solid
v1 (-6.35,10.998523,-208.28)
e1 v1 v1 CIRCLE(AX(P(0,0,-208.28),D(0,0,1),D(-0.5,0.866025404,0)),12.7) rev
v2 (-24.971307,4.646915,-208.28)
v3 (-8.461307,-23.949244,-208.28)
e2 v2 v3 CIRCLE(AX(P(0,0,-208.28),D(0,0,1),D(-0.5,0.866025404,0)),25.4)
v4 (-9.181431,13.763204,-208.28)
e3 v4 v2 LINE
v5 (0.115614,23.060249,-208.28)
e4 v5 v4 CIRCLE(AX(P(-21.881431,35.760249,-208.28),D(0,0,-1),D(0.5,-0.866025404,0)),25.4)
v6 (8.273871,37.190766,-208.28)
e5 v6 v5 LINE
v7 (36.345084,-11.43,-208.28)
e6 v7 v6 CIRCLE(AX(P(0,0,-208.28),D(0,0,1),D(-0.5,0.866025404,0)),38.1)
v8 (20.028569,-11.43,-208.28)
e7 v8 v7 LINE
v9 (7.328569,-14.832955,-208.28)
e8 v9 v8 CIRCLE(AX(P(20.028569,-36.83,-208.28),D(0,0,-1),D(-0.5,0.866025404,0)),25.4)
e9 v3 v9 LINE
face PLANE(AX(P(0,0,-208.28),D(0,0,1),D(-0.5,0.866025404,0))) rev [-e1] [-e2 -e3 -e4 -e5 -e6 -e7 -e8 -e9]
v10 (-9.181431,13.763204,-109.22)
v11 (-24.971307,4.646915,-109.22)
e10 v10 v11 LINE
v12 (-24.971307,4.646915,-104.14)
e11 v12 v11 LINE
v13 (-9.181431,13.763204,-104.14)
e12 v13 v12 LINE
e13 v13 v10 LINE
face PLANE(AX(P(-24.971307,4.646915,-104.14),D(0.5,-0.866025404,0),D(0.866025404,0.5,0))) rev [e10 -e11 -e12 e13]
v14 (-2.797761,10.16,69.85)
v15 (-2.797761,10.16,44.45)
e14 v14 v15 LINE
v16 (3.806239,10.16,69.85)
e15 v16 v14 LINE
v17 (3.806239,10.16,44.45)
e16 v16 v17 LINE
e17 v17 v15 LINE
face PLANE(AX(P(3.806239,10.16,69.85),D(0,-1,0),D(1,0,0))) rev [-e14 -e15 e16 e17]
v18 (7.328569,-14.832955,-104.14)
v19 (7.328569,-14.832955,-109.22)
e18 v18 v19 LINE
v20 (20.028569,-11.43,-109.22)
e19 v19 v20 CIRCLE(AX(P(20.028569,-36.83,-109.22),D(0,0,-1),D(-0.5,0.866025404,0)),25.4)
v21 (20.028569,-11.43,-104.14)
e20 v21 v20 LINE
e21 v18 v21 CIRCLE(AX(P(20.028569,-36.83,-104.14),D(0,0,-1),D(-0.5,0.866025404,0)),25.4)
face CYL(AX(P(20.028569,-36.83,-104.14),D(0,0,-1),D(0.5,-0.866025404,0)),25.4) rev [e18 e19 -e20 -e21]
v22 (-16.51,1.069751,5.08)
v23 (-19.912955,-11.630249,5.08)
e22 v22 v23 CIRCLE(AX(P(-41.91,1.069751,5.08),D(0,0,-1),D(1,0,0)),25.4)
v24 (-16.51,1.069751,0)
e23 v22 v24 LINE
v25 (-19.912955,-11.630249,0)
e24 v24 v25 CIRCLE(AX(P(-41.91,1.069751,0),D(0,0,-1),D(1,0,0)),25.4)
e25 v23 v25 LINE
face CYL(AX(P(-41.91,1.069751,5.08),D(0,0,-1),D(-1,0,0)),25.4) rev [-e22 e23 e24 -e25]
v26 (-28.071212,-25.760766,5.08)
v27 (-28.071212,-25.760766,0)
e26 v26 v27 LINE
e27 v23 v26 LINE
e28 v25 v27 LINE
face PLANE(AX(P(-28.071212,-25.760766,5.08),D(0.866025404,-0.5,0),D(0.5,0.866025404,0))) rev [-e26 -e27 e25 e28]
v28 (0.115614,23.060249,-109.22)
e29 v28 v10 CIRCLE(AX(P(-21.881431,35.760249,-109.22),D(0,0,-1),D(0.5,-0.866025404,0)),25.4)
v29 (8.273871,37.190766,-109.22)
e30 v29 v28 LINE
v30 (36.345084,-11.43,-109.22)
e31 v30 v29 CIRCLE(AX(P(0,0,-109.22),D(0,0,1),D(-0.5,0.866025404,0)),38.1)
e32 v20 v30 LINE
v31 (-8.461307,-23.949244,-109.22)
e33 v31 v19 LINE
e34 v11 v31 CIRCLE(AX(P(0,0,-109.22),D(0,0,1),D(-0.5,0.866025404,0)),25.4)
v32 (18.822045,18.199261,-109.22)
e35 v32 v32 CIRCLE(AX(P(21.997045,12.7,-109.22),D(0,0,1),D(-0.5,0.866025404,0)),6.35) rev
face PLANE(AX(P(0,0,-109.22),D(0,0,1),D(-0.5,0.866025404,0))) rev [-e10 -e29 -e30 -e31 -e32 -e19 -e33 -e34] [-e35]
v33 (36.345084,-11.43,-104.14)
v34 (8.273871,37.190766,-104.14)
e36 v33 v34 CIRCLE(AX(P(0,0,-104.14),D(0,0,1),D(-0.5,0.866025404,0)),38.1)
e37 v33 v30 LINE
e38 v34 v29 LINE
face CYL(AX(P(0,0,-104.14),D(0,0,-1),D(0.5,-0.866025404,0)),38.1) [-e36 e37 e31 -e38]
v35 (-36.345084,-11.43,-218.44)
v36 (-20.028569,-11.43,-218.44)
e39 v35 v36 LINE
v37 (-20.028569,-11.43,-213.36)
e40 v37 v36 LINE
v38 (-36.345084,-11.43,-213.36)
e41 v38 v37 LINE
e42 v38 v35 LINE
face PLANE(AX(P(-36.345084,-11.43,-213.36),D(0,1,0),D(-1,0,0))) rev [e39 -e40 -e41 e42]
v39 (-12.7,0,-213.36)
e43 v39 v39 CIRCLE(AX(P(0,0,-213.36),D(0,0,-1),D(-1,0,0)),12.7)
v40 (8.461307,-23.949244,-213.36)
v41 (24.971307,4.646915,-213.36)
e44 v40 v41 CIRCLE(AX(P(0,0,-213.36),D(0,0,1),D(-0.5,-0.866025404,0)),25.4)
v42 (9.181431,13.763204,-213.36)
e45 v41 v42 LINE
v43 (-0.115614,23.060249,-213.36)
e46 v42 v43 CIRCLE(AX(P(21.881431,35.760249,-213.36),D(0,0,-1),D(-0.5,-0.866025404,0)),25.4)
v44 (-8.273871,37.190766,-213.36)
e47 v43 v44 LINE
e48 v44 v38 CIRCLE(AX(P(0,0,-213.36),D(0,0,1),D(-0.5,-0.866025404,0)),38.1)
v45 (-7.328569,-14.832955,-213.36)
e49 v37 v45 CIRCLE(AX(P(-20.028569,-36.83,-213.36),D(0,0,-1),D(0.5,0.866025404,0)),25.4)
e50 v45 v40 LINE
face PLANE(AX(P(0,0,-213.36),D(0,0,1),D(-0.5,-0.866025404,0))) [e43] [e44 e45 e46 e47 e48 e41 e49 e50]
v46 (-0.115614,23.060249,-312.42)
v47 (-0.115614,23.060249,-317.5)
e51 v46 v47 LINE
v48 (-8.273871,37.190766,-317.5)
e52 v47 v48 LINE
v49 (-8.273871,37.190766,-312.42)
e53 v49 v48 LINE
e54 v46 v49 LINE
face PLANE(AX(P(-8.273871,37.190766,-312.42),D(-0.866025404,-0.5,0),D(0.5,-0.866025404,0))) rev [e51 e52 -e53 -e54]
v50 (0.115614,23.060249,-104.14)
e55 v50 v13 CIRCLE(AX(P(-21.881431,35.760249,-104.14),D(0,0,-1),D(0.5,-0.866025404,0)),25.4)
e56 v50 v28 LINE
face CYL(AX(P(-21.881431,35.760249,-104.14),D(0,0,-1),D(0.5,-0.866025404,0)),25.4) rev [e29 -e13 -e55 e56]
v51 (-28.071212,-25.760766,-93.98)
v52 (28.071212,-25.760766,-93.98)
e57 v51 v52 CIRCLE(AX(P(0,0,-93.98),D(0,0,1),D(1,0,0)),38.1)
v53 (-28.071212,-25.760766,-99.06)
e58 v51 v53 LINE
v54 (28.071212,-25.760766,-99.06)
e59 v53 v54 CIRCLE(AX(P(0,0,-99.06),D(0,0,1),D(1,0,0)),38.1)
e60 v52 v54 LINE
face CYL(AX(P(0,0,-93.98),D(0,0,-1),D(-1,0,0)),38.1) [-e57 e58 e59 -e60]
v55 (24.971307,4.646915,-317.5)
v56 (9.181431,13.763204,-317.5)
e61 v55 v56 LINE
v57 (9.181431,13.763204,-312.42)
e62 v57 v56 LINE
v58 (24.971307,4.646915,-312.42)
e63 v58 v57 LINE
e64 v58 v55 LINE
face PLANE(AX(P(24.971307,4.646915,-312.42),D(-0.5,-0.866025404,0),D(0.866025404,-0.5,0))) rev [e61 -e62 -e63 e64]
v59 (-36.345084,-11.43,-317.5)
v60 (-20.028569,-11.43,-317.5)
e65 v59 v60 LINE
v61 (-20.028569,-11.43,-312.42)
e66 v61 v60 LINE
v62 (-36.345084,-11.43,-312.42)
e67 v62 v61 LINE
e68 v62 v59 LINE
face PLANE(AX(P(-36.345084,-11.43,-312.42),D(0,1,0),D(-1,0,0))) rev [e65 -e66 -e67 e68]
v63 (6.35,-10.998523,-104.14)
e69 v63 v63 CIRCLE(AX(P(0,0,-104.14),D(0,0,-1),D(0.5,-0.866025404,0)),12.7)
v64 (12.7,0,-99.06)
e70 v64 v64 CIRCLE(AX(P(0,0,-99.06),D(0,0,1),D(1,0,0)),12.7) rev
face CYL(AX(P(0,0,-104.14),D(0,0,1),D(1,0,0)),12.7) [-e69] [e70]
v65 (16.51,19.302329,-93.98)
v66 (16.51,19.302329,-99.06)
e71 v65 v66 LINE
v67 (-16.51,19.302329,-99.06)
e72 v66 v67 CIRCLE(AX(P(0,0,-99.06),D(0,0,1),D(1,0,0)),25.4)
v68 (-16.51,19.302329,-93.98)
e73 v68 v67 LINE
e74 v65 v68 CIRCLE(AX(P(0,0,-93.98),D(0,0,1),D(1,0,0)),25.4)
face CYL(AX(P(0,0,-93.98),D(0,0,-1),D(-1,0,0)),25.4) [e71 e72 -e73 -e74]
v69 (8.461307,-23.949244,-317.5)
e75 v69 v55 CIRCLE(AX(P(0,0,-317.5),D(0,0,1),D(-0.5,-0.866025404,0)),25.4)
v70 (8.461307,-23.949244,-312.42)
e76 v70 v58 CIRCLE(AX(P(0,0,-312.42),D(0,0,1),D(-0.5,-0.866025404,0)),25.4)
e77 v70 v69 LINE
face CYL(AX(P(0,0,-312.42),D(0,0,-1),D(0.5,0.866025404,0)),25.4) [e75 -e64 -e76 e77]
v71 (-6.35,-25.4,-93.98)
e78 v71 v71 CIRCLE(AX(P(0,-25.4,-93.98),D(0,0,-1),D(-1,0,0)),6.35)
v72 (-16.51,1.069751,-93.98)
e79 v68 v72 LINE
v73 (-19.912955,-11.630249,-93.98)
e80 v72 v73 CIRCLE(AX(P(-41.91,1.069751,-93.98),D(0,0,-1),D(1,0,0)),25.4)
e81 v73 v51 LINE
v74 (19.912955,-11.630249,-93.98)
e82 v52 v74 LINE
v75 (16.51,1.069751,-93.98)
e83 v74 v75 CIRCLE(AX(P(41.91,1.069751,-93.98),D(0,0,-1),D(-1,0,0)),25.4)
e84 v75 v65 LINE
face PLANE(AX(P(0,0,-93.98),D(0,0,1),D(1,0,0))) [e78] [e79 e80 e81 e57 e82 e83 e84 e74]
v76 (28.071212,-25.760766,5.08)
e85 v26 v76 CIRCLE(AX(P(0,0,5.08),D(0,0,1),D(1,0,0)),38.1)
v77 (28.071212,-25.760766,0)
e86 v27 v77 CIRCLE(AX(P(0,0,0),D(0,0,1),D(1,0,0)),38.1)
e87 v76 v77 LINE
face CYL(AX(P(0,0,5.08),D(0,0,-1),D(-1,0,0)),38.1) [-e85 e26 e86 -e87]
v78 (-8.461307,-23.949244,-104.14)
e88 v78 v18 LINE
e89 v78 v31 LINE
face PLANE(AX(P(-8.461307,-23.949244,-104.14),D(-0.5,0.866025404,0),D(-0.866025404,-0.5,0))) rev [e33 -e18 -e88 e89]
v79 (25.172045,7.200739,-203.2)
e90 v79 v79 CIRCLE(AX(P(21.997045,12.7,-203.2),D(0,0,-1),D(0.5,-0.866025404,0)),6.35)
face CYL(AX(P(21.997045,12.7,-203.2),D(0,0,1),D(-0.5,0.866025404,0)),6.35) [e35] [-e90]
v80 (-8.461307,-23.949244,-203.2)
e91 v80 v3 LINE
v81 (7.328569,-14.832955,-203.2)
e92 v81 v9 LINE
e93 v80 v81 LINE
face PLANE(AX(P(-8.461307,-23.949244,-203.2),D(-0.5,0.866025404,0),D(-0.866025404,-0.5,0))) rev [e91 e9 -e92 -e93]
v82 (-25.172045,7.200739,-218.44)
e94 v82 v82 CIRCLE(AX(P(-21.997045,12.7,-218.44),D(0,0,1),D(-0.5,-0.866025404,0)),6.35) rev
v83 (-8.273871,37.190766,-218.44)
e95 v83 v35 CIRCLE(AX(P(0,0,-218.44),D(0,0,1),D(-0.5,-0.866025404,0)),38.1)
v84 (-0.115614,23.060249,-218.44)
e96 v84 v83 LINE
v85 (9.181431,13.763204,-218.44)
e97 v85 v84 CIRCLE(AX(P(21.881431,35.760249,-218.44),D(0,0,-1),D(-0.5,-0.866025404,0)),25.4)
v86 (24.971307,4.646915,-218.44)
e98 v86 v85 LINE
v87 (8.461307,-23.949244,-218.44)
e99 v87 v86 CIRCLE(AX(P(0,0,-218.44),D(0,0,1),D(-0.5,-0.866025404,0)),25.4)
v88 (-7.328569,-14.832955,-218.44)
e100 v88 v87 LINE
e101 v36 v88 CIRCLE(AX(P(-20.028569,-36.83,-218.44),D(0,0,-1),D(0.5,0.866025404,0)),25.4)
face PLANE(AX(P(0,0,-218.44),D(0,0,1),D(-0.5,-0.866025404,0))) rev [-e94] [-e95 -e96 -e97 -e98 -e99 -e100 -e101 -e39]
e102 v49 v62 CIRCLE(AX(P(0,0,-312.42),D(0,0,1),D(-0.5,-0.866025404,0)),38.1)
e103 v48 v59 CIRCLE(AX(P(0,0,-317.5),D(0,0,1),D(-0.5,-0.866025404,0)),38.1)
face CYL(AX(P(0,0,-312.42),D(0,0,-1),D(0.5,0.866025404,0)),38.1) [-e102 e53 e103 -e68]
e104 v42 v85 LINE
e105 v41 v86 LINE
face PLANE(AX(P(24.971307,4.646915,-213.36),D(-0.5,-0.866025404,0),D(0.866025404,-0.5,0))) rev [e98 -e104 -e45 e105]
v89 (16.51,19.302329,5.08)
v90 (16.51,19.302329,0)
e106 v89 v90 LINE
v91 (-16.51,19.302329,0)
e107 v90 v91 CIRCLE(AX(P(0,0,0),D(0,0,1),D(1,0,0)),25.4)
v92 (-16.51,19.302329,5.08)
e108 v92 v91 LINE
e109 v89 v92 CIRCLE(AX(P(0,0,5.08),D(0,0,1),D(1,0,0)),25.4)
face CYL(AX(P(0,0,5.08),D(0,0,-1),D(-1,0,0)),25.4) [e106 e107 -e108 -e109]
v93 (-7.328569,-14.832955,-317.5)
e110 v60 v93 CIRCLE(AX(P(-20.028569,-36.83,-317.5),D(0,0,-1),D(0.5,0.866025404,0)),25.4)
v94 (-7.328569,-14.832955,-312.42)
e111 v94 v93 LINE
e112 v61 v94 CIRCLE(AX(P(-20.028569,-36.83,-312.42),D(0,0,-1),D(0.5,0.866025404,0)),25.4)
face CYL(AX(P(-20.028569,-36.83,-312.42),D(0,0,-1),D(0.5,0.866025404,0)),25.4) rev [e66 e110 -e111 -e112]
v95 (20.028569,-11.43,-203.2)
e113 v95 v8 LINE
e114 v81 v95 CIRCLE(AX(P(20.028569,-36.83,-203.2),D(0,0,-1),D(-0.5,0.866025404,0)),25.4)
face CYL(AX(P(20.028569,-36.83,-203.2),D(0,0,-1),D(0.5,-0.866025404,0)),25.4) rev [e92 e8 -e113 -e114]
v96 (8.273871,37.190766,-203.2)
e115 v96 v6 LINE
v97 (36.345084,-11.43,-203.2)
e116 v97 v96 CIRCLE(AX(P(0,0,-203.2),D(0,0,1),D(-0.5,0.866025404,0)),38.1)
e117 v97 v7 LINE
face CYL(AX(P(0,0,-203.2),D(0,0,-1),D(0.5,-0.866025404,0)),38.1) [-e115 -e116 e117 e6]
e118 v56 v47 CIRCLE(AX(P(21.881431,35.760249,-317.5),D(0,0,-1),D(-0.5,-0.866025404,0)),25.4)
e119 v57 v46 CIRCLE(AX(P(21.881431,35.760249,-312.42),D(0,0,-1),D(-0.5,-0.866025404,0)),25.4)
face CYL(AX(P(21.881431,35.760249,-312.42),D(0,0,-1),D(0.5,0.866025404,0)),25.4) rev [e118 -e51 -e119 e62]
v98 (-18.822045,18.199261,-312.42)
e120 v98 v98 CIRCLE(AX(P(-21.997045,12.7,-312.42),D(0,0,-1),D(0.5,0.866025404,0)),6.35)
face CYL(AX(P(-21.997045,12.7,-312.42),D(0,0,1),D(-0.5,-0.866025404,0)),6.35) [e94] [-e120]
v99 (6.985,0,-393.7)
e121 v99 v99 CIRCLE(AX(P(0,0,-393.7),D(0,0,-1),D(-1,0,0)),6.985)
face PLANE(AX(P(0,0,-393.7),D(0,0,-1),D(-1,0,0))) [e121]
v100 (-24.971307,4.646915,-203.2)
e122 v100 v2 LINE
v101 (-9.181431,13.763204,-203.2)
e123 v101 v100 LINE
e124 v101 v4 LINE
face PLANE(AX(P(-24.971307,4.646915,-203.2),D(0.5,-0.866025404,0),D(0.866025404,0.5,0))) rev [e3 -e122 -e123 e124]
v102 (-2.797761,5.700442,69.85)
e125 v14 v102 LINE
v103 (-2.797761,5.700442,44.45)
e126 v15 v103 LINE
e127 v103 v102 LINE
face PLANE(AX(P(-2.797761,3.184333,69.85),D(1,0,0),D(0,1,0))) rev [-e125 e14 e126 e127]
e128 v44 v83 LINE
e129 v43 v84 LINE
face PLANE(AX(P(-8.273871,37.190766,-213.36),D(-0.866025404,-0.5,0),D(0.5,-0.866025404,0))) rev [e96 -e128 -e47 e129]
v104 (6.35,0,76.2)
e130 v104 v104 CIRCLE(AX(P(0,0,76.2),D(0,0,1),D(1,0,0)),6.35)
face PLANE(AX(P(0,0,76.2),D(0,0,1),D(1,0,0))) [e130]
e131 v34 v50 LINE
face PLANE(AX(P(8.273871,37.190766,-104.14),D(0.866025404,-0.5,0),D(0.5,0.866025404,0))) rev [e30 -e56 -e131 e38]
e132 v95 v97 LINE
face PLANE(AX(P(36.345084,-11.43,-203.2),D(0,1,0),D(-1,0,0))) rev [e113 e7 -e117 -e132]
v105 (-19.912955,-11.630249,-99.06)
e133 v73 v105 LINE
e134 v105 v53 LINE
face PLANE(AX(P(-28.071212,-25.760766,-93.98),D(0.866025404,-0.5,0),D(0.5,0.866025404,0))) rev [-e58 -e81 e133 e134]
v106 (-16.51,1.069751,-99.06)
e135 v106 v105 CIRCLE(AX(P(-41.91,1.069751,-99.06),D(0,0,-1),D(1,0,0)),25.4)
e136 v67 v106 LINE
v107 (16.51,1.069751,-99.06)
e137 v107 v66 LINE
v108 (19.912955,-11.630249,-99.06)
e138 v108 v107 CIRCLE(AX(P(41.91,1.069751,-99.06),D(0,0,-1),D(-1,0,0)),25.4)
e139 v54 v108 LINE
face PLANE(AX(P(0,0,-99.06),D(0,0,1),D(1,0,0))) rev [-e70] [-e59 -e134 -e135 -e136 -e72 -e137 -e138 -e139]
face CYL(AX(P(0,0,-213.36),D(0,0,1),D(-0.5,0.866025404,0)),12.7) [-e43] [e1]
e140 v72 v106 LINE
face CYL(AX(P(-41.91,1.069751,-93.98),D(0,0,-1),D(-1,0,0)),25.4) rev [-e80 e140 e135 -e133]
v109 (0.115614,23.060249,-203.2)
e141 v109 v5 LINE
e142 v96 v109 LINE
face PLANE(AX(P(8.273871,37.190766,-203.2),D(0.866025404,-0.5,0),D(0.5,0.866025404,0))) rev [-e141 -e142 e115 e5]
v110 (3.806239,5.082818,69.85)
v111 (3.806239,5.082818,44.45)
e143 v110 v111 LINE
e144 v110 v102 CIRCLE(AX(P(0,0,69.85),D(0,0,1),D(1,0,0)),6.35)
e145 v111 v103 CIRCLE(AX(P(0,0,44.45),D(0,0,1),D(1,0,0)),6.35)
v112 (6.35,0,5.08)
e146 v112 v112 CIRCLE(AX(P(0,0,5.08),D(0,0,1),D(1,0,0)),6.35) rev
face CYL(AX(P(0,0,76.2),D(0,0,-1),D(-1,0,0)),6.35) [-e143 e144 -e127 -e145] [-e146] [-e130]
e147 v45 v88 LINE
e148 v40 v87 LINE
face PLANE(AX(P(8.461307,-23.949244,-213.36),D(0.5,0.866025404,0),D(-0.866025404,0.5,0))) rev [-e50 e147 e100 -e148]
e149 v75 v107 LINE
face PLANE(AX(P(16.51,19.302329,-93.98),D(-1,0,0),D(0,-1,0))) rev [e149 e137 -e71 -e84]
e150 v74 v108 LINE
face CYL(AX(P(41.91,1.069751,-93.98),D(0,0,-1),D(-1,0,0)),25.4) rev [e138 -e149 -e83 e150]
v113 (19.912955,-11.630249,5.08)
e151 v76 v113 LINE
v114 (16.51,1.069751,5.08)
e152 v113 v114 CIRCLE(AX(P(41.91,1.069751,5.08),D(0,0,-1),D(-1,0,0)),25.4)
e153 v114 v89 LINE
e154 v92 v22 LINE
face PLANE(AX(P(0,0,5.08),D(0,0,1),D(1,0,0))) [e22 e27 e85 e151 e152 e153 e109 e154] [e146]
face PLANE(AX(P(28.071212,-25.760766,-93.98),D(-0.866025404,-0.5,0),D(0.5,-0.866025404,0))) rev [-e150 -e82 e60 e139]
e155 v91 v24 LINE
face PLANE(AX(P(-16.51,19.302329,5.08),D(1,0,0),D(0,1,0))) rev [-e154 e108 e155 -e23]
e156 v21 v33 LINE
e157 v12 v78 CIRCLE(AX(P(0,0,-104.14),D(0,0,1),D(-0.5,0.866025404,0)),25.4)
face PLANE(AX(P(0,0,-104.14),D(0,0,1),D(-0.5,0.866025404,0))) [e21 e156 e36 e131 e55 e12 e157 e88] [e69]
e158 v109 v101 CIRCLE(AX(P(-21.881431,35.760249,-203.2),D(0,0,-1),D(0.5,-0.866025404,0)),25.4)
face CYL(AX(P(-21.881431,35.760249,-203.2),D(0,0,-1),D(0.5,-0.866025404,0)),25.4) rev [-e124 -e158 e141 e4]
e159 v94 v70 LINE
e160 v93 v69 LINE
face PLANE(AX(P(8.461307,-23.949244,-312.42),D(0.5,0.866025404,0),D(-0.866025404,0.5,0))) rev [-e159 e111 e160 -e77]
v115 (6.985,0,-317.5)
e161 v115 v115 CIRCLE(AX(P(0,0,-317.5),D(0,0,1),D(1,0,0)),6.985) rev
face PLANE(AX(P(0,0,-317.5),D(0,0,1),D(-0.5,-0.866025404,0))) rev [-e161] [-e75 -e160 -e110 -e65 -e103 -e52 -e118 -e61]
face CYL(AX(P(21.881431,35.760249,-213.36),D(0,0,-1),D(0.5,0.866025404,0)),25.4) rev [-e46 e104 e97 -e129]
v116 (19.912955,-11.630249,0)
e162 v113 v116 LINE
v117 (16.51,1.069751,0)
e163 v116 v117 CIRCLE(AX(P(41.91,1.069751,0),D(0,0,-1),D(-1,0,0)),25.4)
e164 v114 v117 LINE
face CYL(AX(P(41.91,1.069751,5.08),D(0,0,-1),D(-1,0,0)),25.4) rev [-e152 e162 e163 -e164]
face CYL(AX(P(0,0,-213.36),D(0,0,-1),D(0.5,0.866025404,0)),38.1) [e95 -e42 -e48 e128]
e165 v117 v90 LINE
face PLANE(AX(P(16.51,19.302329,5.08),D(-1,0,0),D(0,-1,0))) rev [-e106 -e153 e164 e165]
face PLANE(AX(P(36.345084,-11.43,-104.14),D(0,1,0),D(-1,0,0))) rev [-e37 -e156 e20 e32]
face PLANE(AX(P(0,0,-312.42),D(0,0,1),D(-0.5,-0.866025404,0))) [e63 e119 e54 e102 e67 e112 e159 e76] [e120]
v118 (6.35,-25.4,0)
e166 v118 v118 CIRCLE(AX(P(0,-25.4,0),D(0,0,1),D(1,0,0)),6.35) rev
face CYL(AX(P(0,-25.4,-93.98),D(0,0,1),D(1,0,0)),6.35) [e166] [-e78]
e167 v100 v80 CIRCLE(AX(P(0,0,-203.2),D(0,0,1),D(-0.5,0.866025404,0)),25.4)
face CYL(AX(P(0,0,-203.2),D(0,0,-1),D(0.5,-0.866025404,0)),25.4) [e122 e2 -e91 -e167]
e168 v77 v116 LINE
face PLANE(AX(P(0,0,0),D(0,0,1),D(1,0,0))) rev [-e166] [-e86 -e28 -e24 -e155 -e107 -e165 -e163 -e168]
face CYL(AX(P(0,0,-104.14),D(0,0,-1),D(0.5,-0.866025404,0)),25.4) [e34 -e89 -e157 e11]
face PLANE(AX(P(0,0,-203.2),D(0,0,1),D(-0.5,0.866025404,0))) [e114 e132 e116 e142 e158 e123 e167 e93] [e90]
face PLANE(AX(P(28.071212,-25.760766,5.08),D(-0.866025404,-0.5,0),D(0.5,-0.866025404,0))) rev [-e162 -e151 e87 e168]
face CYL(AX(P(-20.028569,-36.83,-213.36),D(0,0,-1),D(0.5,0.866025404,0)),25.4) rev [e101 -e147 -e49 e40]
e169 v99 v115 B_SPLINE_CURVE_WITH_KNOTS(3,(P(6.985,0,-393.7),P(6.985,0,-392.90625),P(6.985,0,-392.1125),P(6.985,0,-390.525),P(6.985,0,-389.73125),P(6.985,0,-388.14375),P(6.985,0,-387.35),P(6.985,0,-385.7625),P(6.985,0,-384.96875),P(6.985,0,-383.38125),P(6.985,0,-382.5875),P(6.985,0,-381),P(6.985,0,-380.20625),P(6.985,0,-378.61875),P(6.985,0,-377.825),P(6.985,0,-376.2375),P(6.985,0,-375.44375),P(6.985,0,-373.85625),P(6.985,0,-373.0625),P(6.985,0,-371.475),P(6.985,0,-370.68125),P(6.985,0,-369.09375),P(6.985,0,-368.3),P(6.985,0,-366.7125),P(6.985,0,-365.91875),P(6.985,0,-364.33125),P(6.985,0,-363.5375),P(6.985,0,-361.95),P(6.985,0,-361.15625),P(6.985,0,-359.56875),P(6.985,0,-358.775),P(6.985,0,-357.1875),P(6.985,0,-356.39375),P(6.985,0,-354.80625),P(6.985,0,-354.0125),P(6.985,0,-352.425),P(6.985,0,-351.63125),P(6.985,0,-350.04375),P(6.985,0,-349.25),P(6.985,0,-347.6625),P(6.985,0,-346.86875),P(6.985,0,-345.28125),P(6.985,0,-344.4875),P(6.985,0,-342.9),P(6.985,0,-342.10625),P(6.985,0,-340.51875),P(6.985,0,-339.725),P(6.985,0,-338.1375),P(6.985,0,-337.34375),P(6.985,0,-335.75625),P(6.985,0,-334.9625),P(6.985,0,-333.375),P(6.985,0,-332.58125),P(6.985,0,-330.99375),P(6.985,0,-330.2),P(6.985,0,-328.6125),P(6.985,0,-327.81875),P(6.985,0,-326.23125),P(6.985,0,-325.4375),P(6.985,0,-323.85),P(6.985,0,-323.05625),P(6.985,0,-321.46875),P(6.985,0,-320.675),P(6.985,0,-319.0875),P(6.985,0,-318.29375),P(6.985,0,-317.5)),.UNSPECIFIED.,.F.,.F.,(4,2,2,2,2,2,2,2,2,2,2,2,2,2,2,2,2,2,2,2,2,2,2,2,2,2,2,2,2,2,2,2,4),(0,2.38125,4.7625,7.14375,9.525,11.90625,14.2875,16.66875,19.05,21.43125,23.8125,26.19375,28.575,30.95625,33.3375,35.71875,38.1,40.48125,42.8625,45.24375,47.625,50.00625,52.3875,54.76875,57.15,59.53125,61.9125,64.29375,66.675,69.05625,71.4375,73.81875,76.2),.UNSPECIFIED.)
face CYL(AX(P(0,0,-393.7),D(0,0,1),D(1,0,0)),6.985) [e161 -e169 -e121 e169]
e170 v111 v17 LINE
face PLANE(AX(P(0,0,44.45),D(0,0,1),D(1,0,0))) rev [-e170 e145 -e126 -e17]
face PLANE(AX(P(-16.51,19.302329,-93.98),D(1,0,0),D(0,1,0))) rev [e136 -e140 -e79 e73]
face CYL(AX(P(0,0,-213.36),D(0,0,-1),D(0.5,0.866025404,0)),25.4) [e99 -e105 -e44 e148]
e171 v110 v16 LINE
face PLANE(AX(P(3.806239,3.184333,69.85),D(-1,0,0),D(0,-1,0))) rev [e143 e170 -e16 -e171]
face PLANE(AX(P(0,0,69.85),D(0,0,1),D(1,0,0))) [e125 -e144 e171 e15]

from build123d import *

# Parameters (mm, degrees)
BOSS_EXTRUDE1_DEPTH    = 5.08
SKETCH2_R              = 6.35
BOSS_EXTRUDE2_DEPTH    = 76.2
BOSS_EXTRUDE3_START    = 44.45
SKETCH3_W              = 6.604
SKETCH3_H              = 6.975666606
BOSS_EXTRUDE3_DEPTH    = 25.4
SKETCH4_R              = 6.35
BOSS_EXTRUDE4_DEPTH    = 93.98
LPATTERN1_COUNT        = 2
LPATTERN1_PITCH        = 99.06
SKETCH5_R              = 12.7
BOSS_EXTRUDE5_DEPTH    = 5.08
LPATTERN2_COUNT        = 2
LPATTERN2_PITCH        = 109.22
LPATTERN2_COPY_1_DEPTH = 5.08
MOVE_START             = -208.28
MOVE_FACE1_DEPTH       = 104.14
MOVE_START_2           = -203.2
MOVE_FACE1_2_DEPTH     = 93.98
MOVE_FACE1_3_OUTLINE_R = 6.35
MOVE_FACE1_3_DEPTH     = 104.14
MOVE_FACE1_4_DEPTH     = 5.08
MOVE_START_3           = -109.22
MOVE_FACE1_5_DEPTH     = 5.08
LPATTERN3_COUNT        = 2
LPATTERN3_PITCH        = 218.44
LPATTERN3_COPY_1_DEPTH = 5.08
MOVE_START_4           = -317.5
MOVE_FACE2_DEPTH       = 104.14
MOVE_START_5           = -312.42
MOVE_FACE2_2_DEPTH     = 93.98
MOVE_FACE2_3_OUTLINE_R = 6.35
MOVE_FACE2_3_DEPTH     = 104.14
MOVE_FACE2_4_DEPTH     = 5.08
MOVE_START_6           = -218.44
MOVE_FACE2_5_DEPTH     = 5.08
SKETCH6_R              = 6.985
BOSS_EXTRUDE6_DEPTH    = 76.2


# Read off the part's stored shape, not the designer's step: Move Face1, Move Face2
with BuildPart() as part:
    # Sketch1 → Boss-Extrude1 (new body)
    with BuildSketch(Plane.XY):
        with BuildLine():
            Line((28.071212152, -25.760765678), (19.912954744, -11.630249345))
            ThreePointArc((19.912954744, -11.630249345), (17.375484012, -5.504253091), (16.51, 1.069750655))
            Line((16.51, 1.069750655), (16.51, 19.302328875))
            ThreePointArc((16.51, 19.302328875), (0, 25.4), (-16.51, 19.302328875))
            Line((-16.51, 19.302328875), (-16.51, 1.069750655))
            ThreePointArc((-16.51, 1.069750655), (-17.375484012, -5.504253091), (-19.912954744, -11.630249345))
            Line((-19.912954744, -11.630249345), (-28.071212152, -25.760765678))
            ThreePointArc((-28.071212152, -25.760765678), (0, -38.1), (28.071212152, -25.760765678))
        make_face()
    boss_extrude1 = extrude(amount=BOSS_EXTRUDE1_DEPTH)

    # Sketch2 → Boss-Extrude2 (add)
    with BuildSketch(Plane.XY):
        with Locations(Location((0, 0, 0), (0, 0, 180))):
            Circle(SKETCH2_R)
    extrude(amount=BOSS_EXTRUDE2_DEPTH)

    # Sketch3 → Boss-Extrude3 (add)
    with BuildSketch(Plane.XY.offset(BOSS_EXTRUDE3_START)):
        with Locations((0.504239379, 6.672166697)):
            Rectangle(SKETCH3_W, SKETCH3_H)
    extrude(amount=BOSS_EXTRUDE3_DEPTH)

    # Sketch4 → Boss-Extrude4 (add)
    with BuildSketch(Plane(origin=(0, 0, 0), x_dir=(-1, 0, 0), z_dir=(0, 0, -1))):
        with Locations(Location((0, -25.4, 0), (0, 0, 180))):
            Circle(SKETCH4_R)
    boss_extrude4 = extrude(amount=BOSS_EXTRUDE4_DEPTH)

    # LPattern1: Boss-Extrude1 ×2
    with Locations(*[(0, 0, -i * LPATTERN1_PITCH) for i in range(1, LPATTERN1_COUNT)]):
        add(boss_extrude1)

    # Sketch5 → Boss-Extrude5 (add)
    with BuildSketch(Plane(origin=(0, 0, -99.06), x_dir=(-1, 0, 0), z_dir=(0, 0, -1))):
        with Locations(Location((0, 0, 0), (0, 0, 180))):
            Circle(SKETCH5_R)
    boss_extrude5 = extrude(amount=BOSS_EXTRUDE5_DEPTH)

    # LPattern2: Boss-Extrude1, Boss-Extrude4, Boss-Extrude5 ×2
    with Locations(*[(0, 0, -i * LPATTERN2_PITCH) for i in range(1, LPATTERN2_COUNT)]):
        add(boss_extrude1)
        add(boss_extrude4)
        add(boss_extrude5)

    # LPattern2 copy 1 sketch → LPattern2 copy 1 (add)
    with BuildSketch(Plane.XY.offset(-208.28)):
        with BuildLine():
            Line((28.071212152, -25.760765678), (19.912954744, -11.630249345))
            ThreePointArc((19.912954744, -11.630249345), (17.375484012, -5.504253091), (16.51, 1.069750655))
            Line((16.51, 1.069750655), (16.51, 19.302328875))
            ThreePointArc((16.51, 19.302328875), (0, 25.4), (-16.51, 19.302328875))
            Line((-16.51, 19.302328875), (-16.51, 1.069750655))
            ThreePointArc((-16.51, 1.069750655), (-17.375484012, -5.504253091), (-19.912954744, -11.630249345))
            Line((-19.912954744, -11.630249345), (-28.071212152, -25.760765678))
            ThreePointArc((-28.071212152, -25.760765678), (0, -38.1), (28.071212152, -25.760765678))
        make_face()
    extrude(amount=LPATTERN2_COPY_1_DEPTH)

    # Move Face1 outline → Move Face1 (cut)
    with BuildSketch(Plane.XY.offset(MOVE_START)):
        with BuildLine():
            Line((0.115614013, 23.060249345), (1.442792283, 25.358989539))
            ThreePointArc((1.442792283, 25.358989539), (-8.119480999, 24.067281282), (-16.51, 19.302328875))
            Line((-16.51, 19.302328875), (-16.51, 9.532052944))
            Line((-16.51, 9.532052944), (-9.181431243, 13.763204089))
            ThreePointArc((-9.181431243, 13.763204089), (-3.920919001, 17.799737103), (0.115614013, 23.060249345))
        make_face()
        with BuildLine():
            ThreePointArc((19.912954744, -11.630249345), (19.855820207, -11.530771305), (19.79913554, -11.431036234))
            ThreePointArc((19.79913554, -11.431036234), (13.343823196, -12.325425391), (7.328568757, -14.832954744))
            Line((7.328568757, -14.832954744), (-8.461307158, -23.949243854))
            ThreePointArc((-8.461307158, -23.949243854), (-15.673074402, -19.987864788), (-21.240133013, -13.928989539))
            Line((-21.240133013, -13.928989539), (-28.071212152, -25.760765678))
            ThreePointArc((-28.071212152, -25.760765678), (0, -38.1), (28.071212152, -25.760765678))
            Line((28.071212152, -25.760765678), (19.912954744, -11.630249345))
        make_face()
    extrude(amount=MOVE_FACE1_DEPTH, mode=Mode.SUBTRACT)

    # Move Face1 2 outline → Move Face1 2 (cut)
    with BuildSketch(Plane.XY.offset(MOVE_START_2)):
        with BuildLine():
            Line((-5.511396499, -22.246112141), (0.024351243, -19.050046692))
            ThreePointArc((0.024351243, -19.050046692), (-3.175, -19.900738686), (-5.511396499, -22.246112141))
        make_face()
    extrude(amount=MOVE_FACE1_2_DEPTH, mode=Mode.SUBTRACT)

    # Move Face1 3 outline → Move Face1 3 (add)
    with BuildSketch(Plane.XY.offset(MOVE_START)):
        with Locations((21.997045256, 12.7)):
            Circle(MOVE_FACE1_3_OUTLINE_R)
    extrude(amount=MOVE_FACE1_3_DEPTH)

    # Move Face1 4 outline → Move Face1 4 (add)
    with BuildSketch(Plane.XY.offset(MOVE_START)):
        with BuildLine():
            ThreePointArc((36.345083574, -11.43), (32.995567884, 19.05), (8.273871422, 37.190765678))
            Line((8.273871422, 37.190765678), (1.442792283, 25.358989539))
            ThreePointArc((1.442792283, 25.358989539), (9.473461473, 23.567212981), (16.51, 19.302328875))
            Line((16.51, 19.302328875), (16.51, 15.89606545))
            ThreePointArc((16.51, 15.89606545), (28.347045256, 12.7), (16.51, 9.50393455))
            Line((16.51, 9.50393455), (16.51, 1.069750655))
            ThreePointArc((16.51, 1.069750655), (17.346043099, -5.393377176), (19.79913554, -11.431036234))
            ThreePointArc((19.79913554, -11.431036234), (19.913850979, -11.43025906), (20.028568757, -11.43))
            Line((20.028568757, -11.43), (36.345083574, -11.43))
        make_face()
        with BuildLine():
            Line((-16.51, 1.069750655), (-16.51, 9.532052944))
            Line((-16.51, 9.532052944), (-24.971307158, 4.646914979))
            ThreePointArc((-24.971307158, 4.646914979), (-24.90261749, -5.00196383), (-21.240133013, -13.928989539))
            Line((-21.240133013, -13.928989539), (-19.912954744, -11.630249345))
            ThreePointArc((-19.912954744, -11.630249345), (-17.375484012, -5.504253091), (-16.51, 1.069750655))
        make_face()
    extrude(amount=MOVE_FACE1_4_DEPTH)

    # Move Face1 5 outline → Move Face1 5 (add)
    with BuildSketch(Plane.XY.offset(MOVE_START_3)):
        with BuildLine():
            ThreePointArc((36.345083574, -11.43), (32.995567884, 19.05), (8.273871422, 37.190765678))
            Line((8.273871422, 37.190765678), (1.442792283, 25.358989539))
            ThreePointArc((1.442792283, 25.358989539), (9.473461473, 23.567212981), (16.51, 19.302328875))
            Line((16.51, 19.302328875), (16.51, 15.89606545))
            ThreePointArc((16.51, 15.89606545), (28.347045256, 12.7), (16.51, 9.50393455))
            Line((16.51, 9.50393455), (16.51, 1.069750655))
            ThreePointArc((16.51, 1.069750655), (17.346043099, -5.393377176), (19.79913554, -11.431036234))
            ThreePointArc((19.79913554, -11.431036234), (19.913850979, -11.43025906), (20.028568757, -11.43))
            Line((20.028568757, -11.43), (36.345083574, -11.43))
        make_face()
        with BuildLine():
            Line((-16.51, 1.069750655), (-16.51, 9.532052944))
            Line((-16.51, 9.532052944), (-24.971307158, 4.646914979))
            ThreePointArc((-24.971307158, 4.646914979), (-24.90261749, -5.00196383), (-21.240133013, -13.928989539))
            Line((-21.240133013, -13.928989539), (-19.912954744, -11.630249345))
            ThreePointArc((-19.912954744, -11.630249345), (-17.375484012, -5.504253091), (-16.51, 1.069750655))
        make_face()
    extrude(amount=MOVE_FACE1_5_DEPTH)

    # LPattern3: Boss-Extrude1, Boss-Extrude4 ×2
    with Locations(*[(0, 0, -i * LPATTERN3_PITCH) for i in range(1, LPATTERN3_COUNT)]):
        add(boss_extrude1)
        add(boss_extrude4)

    # LPattern3 copy 1 sketch → LPattern3 copy 1 (add)
    with BuildSketch(Plane.XY.offset(-317.5)):
        with BuildLine():
            Line((28.071212152, -25.760765678), (19.912954744, -11.630249345))
            ThreePointArc((19.912954744, -11.630249345), (17.375484012, -5.504253091), (16.51, 1.069750655))
            Line((16.51, 1.069750655), (16.51, 19.302328875))
            ThreePointArc((16.51, 19.302328875), (0, 25.4), (-16.51, 19.302328875))
            Line((-16.51, 19.302328875), (-16.51, 1.069750655))
            ThreePointArc((-16.51, 1.069750655), (-17.375484012, -5.504253091), (-19.912954744, -11.630249345))
            Line((-19.912954744, -11.630249345), (-28.071212152, -25.760765678))
            ThreePointArc((-28.071212152, -25.760765678), (0, -38.1), (28.071212152, -25.760765678))
        make_face()
    extrude(amount=LPATTERN3_COPY_1_DEPTH)

    # Move Face2 outline → Move Face2 (cut)
    with BuildSketch(Plane.XY.offset(MOVE_START_4)):
        with BuildLine():
            ThreePointArc((16.51, 19.302328875), (8.119480999, 24.067281282), (-1.442792283, 25.358989539))
            Line((-1.442792283, 25.358989539), (-0.115614013, 23.060249345))
            ThreePointArc((-0.115614013, 23.060249345), (3.920919001, 17.799737103), (9.181431243, 13.763204089))
            Line((9.181431243, 13.763204089), (16.51, 9.532052944))
            Line((16.51, 9.532052944), (16.51, 19.302328875))
        make_face()
        with BuildLine():
            ThreePointArc((-7.328568757, -14.832954744), (-13.343823196, -12.325425391), (-19.79913554, -11.431036234))
            ThreePointArc((-19.79913554, -11.431036234), (-19.855820207, -11.530771305), (-19.912954744, -11.630249345))
            Line((-19.912954744, -11.630249345), (-28.071212152, -25.760765678))
            ThreePointArc((-28.071212152, -25.760765678), (0, -38.1), (28.071212152, -25.760765678))
            Line((28.071212152, -25.760765678), (21.240133013, -13.928989539))
            ThreePointArc((21.240133013, -13.928989539), (15.673074402, -19.987864788), (8.461307158, -23.949243854))
            Line((8.461307158, -23.949243854), (-7.328568757, -14.832954744))
        make_face()
    extrude(amount=MOVE_FACE2_DEPTH, mode=Mode.SUBTRACT)

    # Move Face2 2 outline → Move Face2 2 (cut)
    with BuildSketch(Plane.XY.offset(MOVE_START_5)):
        with BuildLine():
            ThreePointArc((5.511396499, -22.246112141), (3.175, -19.900738686), (-0.024351243, -19.050046692))
            Line((-0.024351243, -19.050046692), (5.511396499, -22.246112141))
        make_face()
    extrude(amount=MOVE_FACE2_2_DEPTH, mode=Mode.SUBTRACT)

    # Move Face2 3 outline → Move Face2 3 (add)
    with BuildSketch(Plane.XY.offset(MOVE_START_4)):
        with Locations((-21.997045256, 12.7)):
            Circle(MOVE_FACE2_3_OUTLINE_R)
    extrude(amount=MOVE_FACE2_3_DEPTH)

    # Move Face2 4 outline → Move Face2 4 (add)
    with BuildSketch(Plane.XY.offset(MOVE_START_4)):
        with BuildLine():
            ThreePointArc((-8.273871422, 37.190765678), (-32.995567884, 19.05), (-36.345083574, -11.43))
            Line((-36.345083574, -11.43), (-20.028568757, -11.43))
            ThreePointArc((-20.028568757, -11.43), (-19.913850979, -11.43025906), (-19.79913554, -11.431036234))
            ThreePointArc((-19.79913554, -11.431036234), (-17.346043099, -5.393377176), (-16.51, 1.069750655))
            Line((-16.51, 1.069750655), (-16.51, 9.50393455))
            ThreePointArc((-16.51, 9.50393455), (-28.347045256, 12.7), (-16.51, 15.89606545))
            Line((-16.51, 15.89606545), (-16.51, 19.302328875))
            ThreePointArc((-16.51, 19.302328875), (-9.473461473, 23.567212981), (-1.442792283, 25.358989539))
            Line((-1.442792283, 25.358989539), (-8.273871422, 37.190765678))
        make_face()
        with BuildLine():
            Line((24.971307158, 4.646914979), (16.51, 9.532052944))
            Line((16.51, 9.532052944), (16.51, 1.069750655))
            ThreePointArc((16.51, 1.069750655), (17.375484012, -5.504253091), (19.912954744, -11.630249345))
            Line((19.912954744, -11.630249345), (21.240133013, -13.928989539))
            ThreePointArc((21.240133013, -13.928989539), (24.90261749, -5.00196383), (24.971307158, 4.646914979))
        make_face()
    extrude(amount=MOVE_FACE2_4_DEPTH)

    # Move Face2 5 outline → Move Face2 5 (add)
    with BuildSketch(Plane.XY.offset(MOVE_START_6)):
        with BuildLine():
            ThreePointArc((-8.273871422, 37.190765678), (-32.995567884, 19.05), (-36.345083574, -11.43))
            Line((-36.345083574, -11.43), (-20.028568757, -11.43))
            ThreePointArc((-20.028568757, -11.43), (-19.913850979, -11.43025906), (-19.79913554, -11.431036234))
            ThreePointArc((-19.79913554, -11.431036234), (-17.346043099, -5.393377176), (-16.51, 1.069750655))
            Line((-16.51, 1.069750655), (-16.51, 9.50393455))
            ThreePointArc((-16.51, 9.50393455), (-28.347045256, 12.7), (-16.51, 15.89606545))
            Line((-16.51, 15.89606545), (-16.51, 19.302328875))
            ThreePointArc((-16.51, 19.302328875), (-9.473461473, 23.567212981), (-1.442792283, 25.358989539))
            Line((-1.442792283, 25.358989539), (-8.273871422, 37.190765678))
        make_face()
        with BuildLine():
            Line((24.971307158, 4.646914979), (16.51, 9.532052944))
            Line((16.51, 9.532052944), (16.51, 1.069750655))
            ThreePointArc((16.51, 1.069750655), (17.375484012, -5.504253091), (19.912954744, -11.630249345))
            Line((19.912954744, -11.630249345), (21.240133013, -13.928989539))
            ThreePointArc((21.240133013, -13.928989539), (24.90261749, -5.00196383), (24.971307158, 4.646914979))
        make_face()
    extrude(amount=MOVE_FACE2_5_DEPTH)

    # Sketch6 → Boss-Extrude6 (add)
    with BuildSketch(Plane(origin=(0, 0, -317.5), x_dir=(-1, 0, 0), z_dir=(0, 0, -1))):
        with Locations(Location((0, 0, 0), (0, 0, 180))):
            Circle(SKETCH6_R)
    extrude(amount=BOSS_EXTRUDE6_DEPTH)


solid = part.part
